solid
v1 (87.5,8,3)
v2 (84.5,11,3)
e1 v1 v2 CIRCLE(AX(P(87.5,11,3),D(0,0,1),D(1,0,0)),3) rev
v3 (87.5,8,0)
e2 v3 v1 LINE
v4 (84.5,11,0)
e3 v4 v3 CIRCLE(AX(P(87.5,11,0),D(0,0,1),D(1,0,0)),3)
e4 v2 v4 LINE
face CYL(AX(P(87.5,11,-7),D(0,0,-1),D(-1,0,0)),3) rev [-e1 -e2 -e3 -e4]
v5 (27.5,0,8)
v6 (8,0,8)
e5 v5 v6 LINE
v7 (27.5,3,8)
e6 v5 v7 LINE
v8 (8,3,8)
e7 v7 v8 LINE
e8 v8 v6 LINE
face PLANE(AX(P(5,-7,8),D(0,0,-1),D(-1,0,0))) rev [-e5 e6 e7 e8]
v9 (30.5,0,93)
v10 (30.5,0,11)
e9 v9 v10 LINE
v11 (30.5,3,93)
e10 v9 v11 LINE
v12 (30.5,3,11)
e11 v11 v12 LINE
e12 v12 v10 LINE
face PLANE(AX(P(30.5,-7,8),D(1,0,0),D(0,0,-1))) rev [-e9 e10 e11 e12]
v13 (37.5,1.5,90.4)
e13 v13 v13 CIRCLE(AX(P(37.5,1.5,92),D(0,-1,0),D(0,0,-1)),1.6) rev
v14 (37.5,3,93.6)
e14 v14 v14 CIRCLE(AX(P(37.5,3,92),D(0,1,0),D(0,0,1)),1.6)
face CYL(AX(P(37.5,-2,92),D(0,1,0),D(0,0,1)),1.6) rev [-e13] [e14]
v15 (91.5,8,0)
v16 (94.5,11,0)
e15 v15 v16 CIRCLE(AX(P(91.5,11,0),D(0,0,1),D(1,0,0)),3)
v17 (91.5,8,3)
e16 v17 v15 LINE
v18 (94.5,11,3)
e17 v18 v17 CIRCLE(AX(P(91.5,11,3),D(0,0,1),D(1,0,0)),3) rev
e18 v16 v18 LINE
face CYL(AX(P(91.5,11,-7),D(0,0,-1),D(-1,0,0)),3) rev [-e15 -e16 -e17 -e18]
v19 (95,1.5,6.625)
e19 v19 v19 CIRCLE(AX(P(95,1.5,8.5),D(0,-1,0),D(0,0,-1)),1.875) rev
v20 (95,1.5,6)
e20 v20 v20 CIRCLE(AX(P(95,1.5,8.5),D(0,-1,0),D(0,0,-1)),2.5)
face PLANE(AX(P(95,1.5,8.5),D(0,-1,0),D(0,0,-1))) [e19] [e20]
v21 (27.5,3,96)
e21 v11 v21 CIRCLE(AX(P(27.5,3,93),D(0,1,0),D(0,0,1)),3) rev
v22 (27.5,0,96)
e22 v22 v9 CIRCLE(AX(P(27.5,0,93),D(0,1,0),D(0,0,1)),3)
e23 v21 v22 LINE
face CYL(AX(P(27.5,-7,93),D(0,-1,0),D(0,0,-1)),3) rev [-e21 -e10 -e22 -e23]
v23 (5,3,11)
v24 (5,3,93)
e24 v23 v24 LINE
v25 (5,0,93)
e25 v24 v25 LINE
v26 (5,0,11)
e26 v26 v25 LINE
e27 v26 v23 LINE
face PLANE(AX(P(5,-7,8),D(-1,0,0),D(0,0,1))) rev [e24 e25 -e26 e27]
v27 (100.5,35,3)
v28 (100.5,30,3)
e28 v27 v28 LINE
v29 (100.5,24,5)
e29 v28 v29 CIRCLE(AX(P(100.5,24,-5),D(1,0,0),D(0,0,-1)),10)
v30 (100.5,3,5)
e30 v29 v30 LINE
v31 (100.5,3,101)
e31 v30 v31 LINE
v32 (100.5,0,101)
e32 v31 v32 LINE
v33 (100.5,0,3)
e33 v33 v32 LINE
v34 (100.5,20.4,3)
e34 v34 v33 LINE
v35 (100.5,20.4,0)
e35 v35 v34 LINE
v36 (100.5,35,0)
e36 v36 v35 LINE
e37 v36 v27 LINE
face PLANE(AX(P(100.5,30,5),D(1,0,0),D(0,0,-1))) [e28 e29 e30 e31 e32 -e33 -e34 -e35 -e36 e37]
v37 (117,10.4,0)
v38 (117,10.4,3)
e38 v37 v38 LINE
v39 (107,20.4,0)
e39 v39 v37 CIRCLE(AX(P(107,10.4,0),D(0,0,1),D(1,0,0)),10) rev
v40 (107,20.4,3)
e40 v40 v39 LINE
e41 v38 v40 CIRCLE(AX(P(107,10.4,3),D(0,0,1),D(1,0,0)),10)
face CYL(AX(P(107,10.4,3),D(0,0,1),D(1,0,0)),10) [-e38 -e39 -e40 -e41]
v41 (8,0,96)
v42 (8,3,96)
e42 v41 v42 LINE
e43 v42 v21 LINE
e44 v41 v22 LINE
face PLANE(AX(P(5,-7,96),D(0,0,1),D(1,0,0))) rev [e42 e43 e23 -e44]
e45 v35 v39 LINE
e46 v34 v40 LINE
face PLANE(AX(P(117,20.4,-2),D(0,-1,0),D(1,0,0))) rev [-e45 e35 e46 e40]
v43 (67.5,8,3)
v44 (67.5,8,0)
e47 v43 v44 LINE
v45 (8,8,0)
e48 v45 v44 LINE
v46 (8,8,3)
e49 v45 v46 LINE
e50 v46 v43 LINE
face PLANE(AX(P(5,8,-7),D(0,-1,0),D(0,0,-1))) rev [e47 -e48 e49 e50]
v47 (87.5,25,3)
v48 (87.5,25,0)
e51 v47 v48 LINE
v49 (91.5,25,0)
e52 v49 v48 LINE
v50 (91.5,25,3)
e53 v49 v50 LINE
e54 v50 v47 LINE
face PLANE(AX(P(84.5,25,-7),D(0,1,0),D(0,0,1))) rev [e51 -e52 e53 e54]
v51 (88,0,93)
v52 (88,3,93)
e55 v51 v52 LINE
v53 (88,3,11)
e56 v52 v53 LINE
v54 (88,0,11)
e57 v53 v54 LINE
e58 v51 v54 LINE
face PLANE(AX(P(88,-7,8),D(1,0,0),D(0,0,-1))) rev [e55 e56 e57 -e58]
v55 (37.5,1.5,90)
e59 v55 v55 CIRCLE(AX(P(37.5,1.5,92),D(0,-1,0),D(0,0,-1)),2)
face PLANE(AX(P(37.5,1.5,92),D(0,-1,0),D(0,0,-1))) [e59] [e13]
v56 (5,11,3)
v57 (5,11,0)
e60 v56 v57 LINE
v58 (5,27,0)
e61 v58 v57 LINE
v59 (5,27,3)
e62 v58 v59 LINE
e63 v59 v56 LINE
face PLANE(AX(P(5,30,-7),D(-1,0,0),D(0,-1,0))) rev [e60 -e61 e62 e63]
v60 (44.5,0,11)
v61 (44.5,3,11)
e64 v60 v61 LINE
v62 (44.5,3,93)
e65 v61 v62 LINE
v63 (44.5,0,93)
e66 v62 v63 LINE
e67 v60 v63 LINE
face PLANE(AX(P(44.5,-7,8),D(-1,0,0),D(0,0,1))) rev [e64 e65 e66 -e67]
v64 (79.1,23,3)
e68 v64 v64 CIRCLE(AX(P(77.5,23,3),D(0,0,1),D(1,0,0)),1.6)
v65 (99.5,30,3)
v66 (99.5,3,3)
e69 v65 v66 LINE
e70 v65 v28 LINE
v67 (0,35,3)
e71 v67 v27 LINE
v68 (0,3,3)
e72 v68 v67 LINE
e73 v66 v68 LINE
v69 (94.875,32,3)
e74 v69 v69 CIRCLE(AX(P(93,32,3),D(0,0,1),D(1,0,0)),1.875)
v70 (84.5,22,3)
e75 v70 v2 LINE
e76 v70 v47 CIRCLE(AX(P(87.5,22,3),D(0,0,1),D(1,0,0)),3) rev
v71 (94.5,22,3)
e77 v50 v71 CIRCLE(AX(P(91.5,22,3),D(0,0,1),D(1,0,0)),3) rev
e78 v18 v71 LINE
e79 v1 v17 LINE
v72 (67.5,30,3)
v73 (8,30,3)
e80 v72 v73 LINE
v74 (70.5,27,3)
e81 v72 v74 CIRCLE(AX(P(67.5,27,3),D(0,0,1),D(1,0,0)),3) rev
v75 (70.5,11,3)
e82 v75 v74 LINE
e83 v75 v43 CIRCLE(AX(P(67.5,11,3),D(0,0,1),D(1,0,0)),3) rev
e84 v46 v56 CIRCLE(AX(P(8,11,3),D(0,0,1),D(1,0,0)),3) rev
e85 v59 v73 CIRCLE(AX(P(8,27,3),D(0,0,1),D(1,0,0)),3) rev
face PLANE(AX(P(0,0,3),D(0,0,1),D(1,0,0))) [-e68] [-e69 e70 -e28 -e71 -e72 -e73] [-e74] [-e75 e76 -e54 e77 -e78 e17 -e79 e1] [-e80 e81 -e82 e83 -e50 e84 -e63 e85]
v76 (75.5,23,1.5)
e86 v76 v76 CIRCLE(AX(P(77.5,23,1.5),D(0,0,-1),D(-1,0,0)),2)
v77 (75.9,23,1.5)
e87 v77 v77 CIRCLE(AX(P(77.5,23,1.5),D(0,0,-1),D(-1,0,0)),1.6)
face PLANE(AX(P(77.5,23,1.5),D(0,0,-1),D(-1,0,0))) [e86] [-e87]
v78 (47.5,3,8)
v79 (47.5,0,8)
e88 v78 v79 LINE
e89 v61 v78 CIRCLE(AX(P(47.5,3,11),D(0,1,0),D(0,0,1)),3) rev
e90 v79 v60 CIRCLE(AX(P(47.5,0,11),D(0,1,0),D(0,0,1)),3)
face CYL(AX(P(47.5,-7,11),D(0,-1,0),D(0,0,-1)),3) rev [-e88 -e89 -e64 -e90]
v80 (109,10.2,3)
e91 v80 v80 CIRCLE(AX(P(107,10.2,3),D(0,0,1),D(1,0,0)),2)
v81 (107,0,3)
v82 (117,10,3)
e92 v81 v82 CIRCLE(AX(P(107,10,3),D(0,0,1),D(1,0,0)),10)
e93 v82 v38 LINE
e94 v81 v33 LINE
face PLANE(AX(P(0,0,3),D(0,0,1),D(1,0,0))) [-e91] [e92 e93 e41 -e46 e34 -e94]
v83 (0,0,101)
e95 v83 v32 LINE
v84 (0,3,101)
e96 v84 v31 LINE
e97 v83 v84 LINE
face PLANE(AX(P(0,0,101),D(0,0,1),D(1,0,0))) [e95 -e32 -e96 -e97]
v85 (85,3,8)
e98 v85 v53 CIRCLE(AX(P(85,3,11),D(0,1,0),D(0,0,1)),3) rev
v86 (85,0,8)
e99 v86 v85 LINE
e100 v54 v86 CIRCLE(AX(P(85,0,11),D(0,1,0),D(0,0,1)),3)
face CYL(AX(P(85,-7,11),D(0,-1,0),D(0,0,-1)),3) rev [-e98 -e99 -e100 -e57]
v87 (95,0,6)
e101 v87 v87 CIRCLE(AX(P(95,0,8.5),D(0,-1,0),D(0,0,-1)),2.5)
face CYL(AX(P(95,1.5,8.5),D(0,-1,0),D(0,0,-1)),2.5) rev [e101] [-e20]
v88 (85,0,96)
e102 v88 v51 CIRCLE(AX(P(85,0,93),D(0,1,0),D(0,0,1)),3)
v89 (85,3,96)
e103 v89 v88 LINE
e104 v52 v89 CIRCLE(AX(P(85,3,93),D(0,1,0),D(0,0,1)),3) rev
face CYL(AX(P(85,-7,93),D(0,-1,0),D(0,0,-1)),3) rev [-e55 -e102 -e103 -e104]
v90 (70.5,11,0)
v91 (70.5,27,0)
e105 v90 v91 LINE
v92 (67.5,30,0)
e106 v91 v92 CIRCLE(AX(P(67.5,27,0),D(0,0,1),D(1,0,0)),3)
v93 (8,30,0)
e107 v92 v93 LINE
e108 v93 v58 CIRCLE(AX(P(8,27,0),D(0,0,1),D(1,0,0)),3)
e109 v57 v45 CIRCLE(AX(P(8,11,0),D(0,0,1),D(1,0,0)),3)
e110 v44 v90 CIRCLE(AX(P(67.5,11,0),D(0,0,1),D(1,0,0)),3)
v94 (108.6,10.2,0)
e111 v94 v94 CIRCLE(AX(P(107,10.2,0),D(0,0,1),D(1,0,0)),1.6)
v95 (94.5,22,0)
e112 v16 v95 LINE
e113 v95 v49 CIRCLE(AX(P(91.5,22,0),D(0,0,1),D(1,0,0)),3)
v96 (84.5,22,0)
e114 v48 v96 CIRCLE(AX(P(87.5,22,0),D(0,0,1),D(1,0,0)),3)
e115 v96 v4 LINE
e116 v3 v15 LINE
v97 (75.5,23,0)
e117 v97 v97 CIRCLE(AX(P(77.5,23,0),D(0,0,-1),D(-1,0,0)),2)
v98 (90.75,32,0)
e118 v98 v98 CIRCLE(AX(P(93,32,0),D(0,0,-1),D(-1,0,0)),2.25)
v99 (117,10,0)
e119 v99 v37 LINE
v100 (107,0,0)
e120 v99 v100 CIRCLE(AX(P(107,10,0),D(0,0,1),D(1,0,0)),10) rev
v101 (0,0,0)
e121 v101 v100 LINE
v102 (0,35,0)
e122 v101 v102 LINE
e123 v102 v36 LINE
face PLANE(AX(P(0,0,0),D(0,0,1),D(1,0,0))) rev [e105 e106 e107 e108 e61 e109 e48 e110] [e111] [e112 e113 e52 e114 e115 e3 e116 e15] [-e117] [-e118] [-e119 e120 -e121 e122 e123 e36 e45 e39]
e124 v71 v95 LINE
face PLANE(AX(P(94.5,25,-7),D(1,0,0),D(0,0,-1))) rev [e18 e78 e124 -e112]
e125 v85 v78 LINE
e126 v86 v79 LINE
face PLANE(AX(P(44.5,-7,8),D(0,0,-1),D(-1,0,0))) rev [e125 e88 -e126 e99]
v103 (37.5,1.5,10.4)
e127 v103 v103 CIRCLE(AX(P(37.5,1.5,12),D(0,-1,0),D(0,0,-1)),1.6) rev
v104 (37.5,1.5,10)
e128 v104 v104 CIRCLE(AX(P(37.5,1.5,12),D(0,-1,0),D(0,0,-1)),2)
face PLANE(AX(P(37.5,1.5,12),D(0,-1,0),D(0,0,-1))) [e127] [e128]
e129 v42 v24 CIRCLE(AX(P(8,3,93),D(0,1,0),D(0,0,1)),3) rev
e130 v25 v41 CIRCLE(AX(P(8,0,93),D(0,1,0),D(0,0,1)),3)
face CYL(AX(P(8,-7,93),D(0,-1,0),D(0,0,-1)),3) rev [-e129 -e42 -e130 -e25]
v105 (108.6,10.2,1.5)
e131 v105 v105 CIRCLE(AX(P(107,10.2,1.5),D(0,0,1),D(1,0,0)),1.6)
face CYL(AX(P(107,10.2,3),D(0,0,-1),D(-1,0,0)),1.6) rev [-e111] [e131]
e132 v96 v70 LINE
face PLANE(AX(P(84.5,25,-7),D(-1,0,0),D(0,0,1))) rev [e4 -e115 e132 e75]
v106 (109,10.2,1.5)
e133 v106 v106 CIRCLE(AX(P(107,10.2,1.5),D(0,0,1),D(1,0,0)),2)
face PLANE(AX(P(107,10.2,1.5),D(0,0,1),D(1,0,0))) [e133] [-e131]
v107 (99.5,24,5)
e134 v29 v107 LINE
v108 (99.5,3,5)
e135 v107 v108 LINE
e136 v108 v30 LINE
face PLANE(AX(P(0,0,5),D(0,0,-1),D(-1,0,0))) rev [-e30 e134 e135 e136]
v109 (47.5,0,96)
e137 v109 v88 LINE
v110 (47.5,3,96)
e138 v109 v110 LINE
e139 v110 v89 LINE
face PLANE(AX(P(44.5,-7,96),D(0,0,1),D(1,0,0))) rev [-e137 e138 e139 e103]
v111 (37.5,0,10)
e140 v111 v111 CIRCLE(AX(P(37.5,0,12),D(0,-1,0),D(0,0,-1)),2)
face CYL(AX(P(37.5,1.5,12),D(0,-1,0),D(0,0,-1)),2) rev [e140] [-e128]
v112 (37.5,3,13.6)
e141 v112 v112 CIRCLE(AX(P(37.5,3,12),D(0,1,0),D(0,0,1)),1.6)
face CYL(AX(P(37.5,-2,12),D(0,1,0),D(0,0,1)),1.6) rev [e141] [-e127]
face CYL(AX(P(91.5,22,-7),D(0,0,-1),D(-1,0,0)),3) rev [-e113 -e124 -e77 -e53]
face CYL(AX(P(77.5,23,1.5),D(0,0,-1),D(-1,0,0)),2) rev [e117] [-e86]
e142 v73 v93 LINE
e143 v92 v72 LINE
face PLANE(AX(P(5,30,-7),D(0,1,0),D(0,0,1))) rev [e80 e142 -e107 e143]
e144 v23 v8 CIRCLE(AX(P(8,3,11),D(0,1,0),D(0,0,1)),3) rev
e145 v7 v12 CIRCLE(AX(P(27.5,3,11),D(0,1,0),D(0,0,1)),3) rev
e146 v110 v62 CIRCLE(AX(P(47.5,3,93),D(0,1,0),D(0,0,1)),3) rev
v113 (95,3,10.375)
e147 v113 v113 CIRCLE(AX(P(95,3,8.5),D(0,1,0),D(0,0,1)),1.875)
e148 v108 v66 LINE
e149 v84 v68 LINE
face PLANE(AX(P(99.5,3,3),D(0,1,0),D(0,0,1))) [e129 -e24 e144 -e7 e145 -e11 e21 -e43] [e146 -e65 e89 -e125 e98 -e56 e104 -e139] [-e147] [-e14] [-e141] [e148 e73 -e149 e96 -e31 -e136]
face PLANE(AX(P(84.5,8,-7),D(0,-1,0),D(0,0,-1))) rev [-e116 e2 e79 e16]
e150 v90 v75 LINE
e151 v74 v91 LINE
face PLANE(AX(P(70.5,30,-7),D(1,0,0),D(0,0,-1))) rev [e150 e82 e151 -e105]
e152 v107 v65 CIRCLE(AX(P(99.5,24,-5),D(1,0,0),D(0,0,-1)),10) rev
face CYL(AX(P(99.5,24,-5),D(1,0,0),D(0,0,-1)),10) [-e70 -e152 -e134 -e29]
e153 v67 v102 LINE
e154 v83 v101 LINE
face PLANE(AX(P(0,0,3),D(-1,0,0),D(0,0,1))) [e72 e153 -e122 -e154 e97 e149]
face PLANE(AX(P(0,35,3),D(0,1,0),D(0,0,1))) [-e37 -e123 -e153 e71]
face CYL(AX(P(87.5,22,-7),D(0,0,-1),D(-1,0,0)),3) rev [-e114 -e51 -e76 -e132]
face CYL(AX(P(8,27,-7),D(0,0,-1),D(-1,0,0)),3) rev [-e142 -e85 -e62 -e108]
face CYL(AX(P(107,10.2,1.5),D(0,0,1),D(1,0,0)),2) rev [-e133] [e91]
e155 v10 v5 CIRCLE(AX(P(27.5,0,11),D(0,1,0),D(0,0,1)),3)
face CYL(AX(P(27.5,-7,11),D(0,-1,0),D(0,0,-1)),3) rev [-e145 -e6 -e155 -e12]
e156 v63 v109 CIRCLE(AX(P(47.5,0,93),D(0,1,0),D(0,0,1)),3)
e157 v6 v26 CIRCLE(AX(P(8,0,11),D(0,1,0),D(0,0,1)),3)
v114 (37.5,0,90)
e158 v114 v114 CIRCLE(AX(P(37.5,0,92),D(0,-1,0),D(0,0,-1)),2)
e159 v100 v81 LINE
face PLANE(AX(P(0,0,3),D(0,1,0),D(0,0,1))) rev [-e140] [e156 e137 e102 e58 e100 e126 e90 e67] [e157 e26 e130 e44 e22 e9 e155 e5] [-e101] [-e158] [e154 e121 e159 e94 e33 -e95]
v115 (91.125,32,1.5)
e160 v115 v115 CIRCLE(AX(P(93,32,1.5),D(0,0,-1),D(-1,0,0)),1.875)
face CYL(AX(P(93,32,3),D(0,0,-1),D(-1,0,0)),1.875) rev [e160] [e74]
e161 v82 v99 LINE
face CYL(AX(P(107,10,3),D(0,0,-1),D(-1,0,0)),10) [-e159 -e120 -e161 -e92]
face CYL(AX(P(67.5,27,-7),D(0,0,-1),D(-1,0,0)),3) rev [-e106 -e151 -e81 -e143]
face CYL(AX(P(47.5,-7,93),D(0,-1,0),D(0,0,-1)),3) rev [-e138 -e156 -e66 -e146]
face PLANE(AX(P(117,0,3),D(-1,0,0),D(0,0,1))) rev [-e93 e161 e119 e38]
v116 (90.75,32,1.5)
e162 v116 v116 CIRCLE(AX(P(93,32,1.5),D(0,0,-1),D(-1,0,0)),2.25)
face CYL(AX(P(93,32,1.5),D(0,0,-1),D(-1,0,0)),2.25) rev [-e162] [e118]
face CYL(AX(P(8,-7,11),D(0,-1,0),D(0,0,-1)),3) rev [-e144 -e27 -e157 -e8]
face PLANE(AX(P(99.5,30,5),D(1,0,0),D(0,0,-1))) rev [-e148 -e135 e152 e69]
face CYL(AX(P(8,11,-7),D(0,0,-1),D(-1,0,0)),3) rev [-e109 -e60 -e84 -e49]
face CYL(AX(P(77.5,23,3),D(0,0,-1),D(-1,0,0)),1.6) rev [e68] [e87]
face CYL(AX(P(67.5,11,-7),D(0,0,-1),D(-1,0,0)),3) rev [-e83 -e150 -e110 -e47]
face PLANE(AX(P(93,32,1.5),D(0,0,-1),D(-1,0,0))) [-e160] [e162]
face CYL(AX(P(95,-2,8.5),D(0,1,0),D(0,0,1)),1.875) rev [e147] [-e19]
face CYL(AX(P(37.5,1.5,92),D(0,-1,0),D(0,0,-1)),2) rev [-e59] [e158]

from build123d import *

# Parameters (mm, degrees)
SKETCH1_R           = 1.6
SKETCH1_R_2         = 1.875
BOSS_EXTRUDE1_DEPTH = 3
BOSS_EXTRUDE2_DEPTH = 101
SKETCH1_5_W         = 1
SKETCH1_5_H         = 27
BOSS_EXTRUDE3_DEPTH = 5
SKETCH2_W           = 16.5
SKETCH2_H           = 14.6
CUT_EXTRUDE1_DEPTH  = 5
SKETCH3_W           = 16.5
SKETCH3_H           = 98
CUT_EXTRUDE2_DEPTH  = 5
FILLET1_R           = 10
FILLET2_R           = 10
SKETCH4_R           = 1.6
SKETCH4_R_2         = 1.875
CUT_EXTRUDE3_DEPTH  = 5
FILLET3_R           = 10
SKETCH5_R           = 2
SKETCH5_R_2         = 2.5
CUT_EXTRUDE4_DEPTH  = 1.5
SKETCH6_R           = 2
CUT_EXTRUDE5_DEPTH  = 1.5
SKETCH7_R           = 2
SKETCH7_R_2         = 2.25
CUT_EXTRUDE6_DEPTH  = 1.5
SKETCH8_W           = 25.5
SKETCH8_H           = 88
SKETCH8_W_2         = 43.5
CUT_EXTRUDE7_DEPTH  = 10
FILLET4_R           = 3
SKETCH9_W           = 65.5
SKETCH9_H           = 22
SKETCH9_W_2         = 10
SKETCH9_H_2         = 17
CUT_EXTRUDE8_DEPTH  = 10
FILLET5_R           = 3


with BuildPart() as part:
    # Sketch1 → Boss-Extrude1 (new body)
    # profile 1 of 2: a face of its own
    with BuildSketch(Plane.XY):
        Polygon((0, 3), (0, 0), (117, 0), (117, 3), (100.5, 3), (99.5, 3), align=None)
    # profile 2 of 2: a face of its own
    with BuildSketch(Plane.XY):
        Polygon((0, 35), (0, 3), (99.5, 3), (99.5, 30), (100.5, 30), (100.5, 3), (117, 3), (117, 35), align=None)
        with Locations((107, 10.2)):
            Circle(SKETCH1_R, mode=Mode.SUBTRACT)
        with Locations((77.5, 23)):
            Circle(SKETCH1_R, mode=Mode.SUBTRACT)
        with Locations((93, 32)):
            Circle(SKETCH1_R_2, mode=Mode.SUBTRACT)
    extrude(amount=BOSS_EXTRUDE1_DEPTH)

    # Sketch1<4> → Boss-Extrude2 (add)
    with BuildSketch(Plane.XY):
        Polygon((0, 3), (0, 0), (117, 0), (117, 3), (100.5, 3), (99.5, 3), align=None)
    extrude(amount=BOSS_EXTRUDE2_DEPTH)

    # Sketch1<5> → Boss-Extrude3 (add)
    with BuildSketch(Plane.XY):
        with Locations((100, 16.5)):
            Rectangle(SKETCH1_5_W, SKETCH1_5_H)
    extrude(amount=BOSS_EXTRUDE3_DEPTH)

    # Sketch2 → Cut-Extrude1 (cut)
    with BuildSketch(Plane.XY.offset(3)):
        with Locations((108.75, 27.7)):
            Rectangle(SKETCH2_W, SKETCH2_H)
    extrude(amount=-CUT_EXTRUDE1_DEPTH, mode=Mode.SUBTRACT)

    # Sketch3 → Cut-Extrude2 (cut)
    with BuildSketch(Plane(origin=(0, 3, 0), x_dir=(1, 0, 0), z_dir=(0, 1, 0))):
        with Locations((108.75, -52)):
            Rectangle(SKETCH3_W, SKETCH3_H)
    extrude(amount=-CUT_EXTRUDE2_DEPTH, mode=Mode.SUBTRACT)

    # Fillet1
    fillet1_edges = [part.edges().sort_by_distance(p)[0] for p in [
        (117, 20.4, 1.5),
    ]]
    fillet(fillet1_edges, radius=FILLET1_R)

    # Fillet2
    fillet2_edges = [part.edges().sort_by_distance(p)[0] for p in [
        (117, 0, 1.5),
    ]]
    fillet(fillet2_edges, radius=FILLET2_R)

    # Sketch4 → Cut-Extrude3 (cut)
    with BuildSketch(Plane(origin=(0, 3, 0), x_dir=(1, 0, 0), z_dir=(0, 1, 0))):
        with Locations(Location((37.5, -12, 0), (0, 0, 270))):
            Circle(SKETCH4_R)
        with Locations(Location((37.5, -92, 0), (0, 0, 270))):
            Circle(SKETCH4_R)
        with Locations(Location((95, -8.5, 0), (0, 0, 270))):
            Circle(SKETCH4_R_2)
    extrude(amount=-CUT_EXTRUDE3_DEPTH, mode=Mode.SUBTRACT)

    # Fillet3
    # the kernel refuses this fillet: 10 mm, written as the material it takes off along each edge
    with BuildSketch(Plane(origin=(84.5, 30, 5), x_dir=(0, 0, -1), z_dir=(1, 0, 0))) as fillet3_piece_1:
        with BuildLine():
            CenterArc((10, -6), FILLET3_R, 143.130102354, 36.869897646)
            Line((0, -6), (-0.2, -6))
            Line((-0.2, -6), (-0.2, 0))
            Line((-0.2, 0), (0, 0.2))
            ThreePointArc((0, 0.2), (1, 0.2), (1.84, 0.12))
            Line((1.84, 0.12), (2, 0))
        make_face()
    extrude(amount=31, mode=Mode.SUBTRACT)

    # Sketch5 → Cut-Extrude4 (cut)
    with BuildSketch(Plane.XZ):
        with Locations(Location((37.5, 92, 0), (0, 0, 270))):
            Circle(SKETCH5_R)
        with Locations(Location((37.5, 12, 0), (0, 0, 270))):
            Circle(SKETCH5_R)
        with Locations(Location((95, 8.5, 0), (0, 0, 270))):
            Circle(SKETCH5_R_2)
    extrude(amount=-CUT_EXTRUDE4_DEPTH, mode=Mode.SUBTRACT)

    # Sketch6 → Cut-Extrude5 (cut)
    with BuildSketch(Plane.XY.offset(3)):
        with Locations((107, 10.2)):
            Circle(SKETCH6_R)
    extrude(amount=-CUT_EXTRUDE5_DEPTH, mode=Mode.SUBTRACT)

    # Sketch7 → Cut-Extrude6 (cut)
    with BuildSketch(Plane(origin=(0, 0, 0), x_dir=(-1, 0, 0), z_dir=(0, 0, -1))):
        with Locations((-77.5, 23)):
            Circle(SKETCH7_R)
        with Locations((-93, 32)):
            Circle(SKETCH7_R_2)
    extrude(amount=-CUT_EXTRUDE6_DEPTH, mode=Mode.SUBTRACT)

    # Sketch8 → Cut-Extrude7 (cut)
    with BuildSketch(Plane(origin=(0, 3, 0), x_dir=(1, 0, 0), z_dir=(0, 1, 0))):
        with Locations((17.75, -52)):
            Rectangle(SKETCH8_W, SKETCH8_H)
        with Locations((66.25, -52)):
            Rectangle(SKETCH8_W_2, SKETCH8_H)
    extrude(amount=-CUT_EXTRUDE7_DEPTH, mode=Mode.SUBTRACT)

    # Fillet4
    fillet4_edges = [part.edges().sort_by_distance(p)[0] for p in [
        (5, 1.5, 96),
        (5, 1.5, 8),
        (30.5, 1.5, 8),
        (30.5, 1.5, 96),
        (44.5, 1.5, 96),
        (44.5, 1.5, 8),
        (88, 1.5, 8),
        (88, 1.5, 96),
    ]]
    fillet(fillet4_edges, radius=FILLET4_R)

    # Sketch9 → Cut-Extrude8 (cut)
    with BuildSketch(Plane.XY.offset(3)):
        with Locations((37.75, 19)):
            Rectangle(SKETCH9_W, SKETCH9_H)
        with Locations((89.5, 16.5)):
            Rectangle(SKETCH9_W_2, SKETCH9_H_2)
    extrude(amount=-CUT_EXTRUDE8_DEPTH, mode=Mode.SUBTRACT)

    # Fillet5
    fillet5_edges = [part.edges().sort_by_distance(p)[0] for p in [
        (5, 8, 1.5),
        (5, 30, 1.5),
        (70.5, 30, 1.5),
        (70.5, 8, 1.5),
        (84.5, 8, 1.5),
        (84.5, 25, 1.5),
        (94.5, 25, 1.5),
        (94.5, 8, 1.5),
    ]]
    fillet(fillet5_edges, radius=FILLET5_R)


solid = part.part
